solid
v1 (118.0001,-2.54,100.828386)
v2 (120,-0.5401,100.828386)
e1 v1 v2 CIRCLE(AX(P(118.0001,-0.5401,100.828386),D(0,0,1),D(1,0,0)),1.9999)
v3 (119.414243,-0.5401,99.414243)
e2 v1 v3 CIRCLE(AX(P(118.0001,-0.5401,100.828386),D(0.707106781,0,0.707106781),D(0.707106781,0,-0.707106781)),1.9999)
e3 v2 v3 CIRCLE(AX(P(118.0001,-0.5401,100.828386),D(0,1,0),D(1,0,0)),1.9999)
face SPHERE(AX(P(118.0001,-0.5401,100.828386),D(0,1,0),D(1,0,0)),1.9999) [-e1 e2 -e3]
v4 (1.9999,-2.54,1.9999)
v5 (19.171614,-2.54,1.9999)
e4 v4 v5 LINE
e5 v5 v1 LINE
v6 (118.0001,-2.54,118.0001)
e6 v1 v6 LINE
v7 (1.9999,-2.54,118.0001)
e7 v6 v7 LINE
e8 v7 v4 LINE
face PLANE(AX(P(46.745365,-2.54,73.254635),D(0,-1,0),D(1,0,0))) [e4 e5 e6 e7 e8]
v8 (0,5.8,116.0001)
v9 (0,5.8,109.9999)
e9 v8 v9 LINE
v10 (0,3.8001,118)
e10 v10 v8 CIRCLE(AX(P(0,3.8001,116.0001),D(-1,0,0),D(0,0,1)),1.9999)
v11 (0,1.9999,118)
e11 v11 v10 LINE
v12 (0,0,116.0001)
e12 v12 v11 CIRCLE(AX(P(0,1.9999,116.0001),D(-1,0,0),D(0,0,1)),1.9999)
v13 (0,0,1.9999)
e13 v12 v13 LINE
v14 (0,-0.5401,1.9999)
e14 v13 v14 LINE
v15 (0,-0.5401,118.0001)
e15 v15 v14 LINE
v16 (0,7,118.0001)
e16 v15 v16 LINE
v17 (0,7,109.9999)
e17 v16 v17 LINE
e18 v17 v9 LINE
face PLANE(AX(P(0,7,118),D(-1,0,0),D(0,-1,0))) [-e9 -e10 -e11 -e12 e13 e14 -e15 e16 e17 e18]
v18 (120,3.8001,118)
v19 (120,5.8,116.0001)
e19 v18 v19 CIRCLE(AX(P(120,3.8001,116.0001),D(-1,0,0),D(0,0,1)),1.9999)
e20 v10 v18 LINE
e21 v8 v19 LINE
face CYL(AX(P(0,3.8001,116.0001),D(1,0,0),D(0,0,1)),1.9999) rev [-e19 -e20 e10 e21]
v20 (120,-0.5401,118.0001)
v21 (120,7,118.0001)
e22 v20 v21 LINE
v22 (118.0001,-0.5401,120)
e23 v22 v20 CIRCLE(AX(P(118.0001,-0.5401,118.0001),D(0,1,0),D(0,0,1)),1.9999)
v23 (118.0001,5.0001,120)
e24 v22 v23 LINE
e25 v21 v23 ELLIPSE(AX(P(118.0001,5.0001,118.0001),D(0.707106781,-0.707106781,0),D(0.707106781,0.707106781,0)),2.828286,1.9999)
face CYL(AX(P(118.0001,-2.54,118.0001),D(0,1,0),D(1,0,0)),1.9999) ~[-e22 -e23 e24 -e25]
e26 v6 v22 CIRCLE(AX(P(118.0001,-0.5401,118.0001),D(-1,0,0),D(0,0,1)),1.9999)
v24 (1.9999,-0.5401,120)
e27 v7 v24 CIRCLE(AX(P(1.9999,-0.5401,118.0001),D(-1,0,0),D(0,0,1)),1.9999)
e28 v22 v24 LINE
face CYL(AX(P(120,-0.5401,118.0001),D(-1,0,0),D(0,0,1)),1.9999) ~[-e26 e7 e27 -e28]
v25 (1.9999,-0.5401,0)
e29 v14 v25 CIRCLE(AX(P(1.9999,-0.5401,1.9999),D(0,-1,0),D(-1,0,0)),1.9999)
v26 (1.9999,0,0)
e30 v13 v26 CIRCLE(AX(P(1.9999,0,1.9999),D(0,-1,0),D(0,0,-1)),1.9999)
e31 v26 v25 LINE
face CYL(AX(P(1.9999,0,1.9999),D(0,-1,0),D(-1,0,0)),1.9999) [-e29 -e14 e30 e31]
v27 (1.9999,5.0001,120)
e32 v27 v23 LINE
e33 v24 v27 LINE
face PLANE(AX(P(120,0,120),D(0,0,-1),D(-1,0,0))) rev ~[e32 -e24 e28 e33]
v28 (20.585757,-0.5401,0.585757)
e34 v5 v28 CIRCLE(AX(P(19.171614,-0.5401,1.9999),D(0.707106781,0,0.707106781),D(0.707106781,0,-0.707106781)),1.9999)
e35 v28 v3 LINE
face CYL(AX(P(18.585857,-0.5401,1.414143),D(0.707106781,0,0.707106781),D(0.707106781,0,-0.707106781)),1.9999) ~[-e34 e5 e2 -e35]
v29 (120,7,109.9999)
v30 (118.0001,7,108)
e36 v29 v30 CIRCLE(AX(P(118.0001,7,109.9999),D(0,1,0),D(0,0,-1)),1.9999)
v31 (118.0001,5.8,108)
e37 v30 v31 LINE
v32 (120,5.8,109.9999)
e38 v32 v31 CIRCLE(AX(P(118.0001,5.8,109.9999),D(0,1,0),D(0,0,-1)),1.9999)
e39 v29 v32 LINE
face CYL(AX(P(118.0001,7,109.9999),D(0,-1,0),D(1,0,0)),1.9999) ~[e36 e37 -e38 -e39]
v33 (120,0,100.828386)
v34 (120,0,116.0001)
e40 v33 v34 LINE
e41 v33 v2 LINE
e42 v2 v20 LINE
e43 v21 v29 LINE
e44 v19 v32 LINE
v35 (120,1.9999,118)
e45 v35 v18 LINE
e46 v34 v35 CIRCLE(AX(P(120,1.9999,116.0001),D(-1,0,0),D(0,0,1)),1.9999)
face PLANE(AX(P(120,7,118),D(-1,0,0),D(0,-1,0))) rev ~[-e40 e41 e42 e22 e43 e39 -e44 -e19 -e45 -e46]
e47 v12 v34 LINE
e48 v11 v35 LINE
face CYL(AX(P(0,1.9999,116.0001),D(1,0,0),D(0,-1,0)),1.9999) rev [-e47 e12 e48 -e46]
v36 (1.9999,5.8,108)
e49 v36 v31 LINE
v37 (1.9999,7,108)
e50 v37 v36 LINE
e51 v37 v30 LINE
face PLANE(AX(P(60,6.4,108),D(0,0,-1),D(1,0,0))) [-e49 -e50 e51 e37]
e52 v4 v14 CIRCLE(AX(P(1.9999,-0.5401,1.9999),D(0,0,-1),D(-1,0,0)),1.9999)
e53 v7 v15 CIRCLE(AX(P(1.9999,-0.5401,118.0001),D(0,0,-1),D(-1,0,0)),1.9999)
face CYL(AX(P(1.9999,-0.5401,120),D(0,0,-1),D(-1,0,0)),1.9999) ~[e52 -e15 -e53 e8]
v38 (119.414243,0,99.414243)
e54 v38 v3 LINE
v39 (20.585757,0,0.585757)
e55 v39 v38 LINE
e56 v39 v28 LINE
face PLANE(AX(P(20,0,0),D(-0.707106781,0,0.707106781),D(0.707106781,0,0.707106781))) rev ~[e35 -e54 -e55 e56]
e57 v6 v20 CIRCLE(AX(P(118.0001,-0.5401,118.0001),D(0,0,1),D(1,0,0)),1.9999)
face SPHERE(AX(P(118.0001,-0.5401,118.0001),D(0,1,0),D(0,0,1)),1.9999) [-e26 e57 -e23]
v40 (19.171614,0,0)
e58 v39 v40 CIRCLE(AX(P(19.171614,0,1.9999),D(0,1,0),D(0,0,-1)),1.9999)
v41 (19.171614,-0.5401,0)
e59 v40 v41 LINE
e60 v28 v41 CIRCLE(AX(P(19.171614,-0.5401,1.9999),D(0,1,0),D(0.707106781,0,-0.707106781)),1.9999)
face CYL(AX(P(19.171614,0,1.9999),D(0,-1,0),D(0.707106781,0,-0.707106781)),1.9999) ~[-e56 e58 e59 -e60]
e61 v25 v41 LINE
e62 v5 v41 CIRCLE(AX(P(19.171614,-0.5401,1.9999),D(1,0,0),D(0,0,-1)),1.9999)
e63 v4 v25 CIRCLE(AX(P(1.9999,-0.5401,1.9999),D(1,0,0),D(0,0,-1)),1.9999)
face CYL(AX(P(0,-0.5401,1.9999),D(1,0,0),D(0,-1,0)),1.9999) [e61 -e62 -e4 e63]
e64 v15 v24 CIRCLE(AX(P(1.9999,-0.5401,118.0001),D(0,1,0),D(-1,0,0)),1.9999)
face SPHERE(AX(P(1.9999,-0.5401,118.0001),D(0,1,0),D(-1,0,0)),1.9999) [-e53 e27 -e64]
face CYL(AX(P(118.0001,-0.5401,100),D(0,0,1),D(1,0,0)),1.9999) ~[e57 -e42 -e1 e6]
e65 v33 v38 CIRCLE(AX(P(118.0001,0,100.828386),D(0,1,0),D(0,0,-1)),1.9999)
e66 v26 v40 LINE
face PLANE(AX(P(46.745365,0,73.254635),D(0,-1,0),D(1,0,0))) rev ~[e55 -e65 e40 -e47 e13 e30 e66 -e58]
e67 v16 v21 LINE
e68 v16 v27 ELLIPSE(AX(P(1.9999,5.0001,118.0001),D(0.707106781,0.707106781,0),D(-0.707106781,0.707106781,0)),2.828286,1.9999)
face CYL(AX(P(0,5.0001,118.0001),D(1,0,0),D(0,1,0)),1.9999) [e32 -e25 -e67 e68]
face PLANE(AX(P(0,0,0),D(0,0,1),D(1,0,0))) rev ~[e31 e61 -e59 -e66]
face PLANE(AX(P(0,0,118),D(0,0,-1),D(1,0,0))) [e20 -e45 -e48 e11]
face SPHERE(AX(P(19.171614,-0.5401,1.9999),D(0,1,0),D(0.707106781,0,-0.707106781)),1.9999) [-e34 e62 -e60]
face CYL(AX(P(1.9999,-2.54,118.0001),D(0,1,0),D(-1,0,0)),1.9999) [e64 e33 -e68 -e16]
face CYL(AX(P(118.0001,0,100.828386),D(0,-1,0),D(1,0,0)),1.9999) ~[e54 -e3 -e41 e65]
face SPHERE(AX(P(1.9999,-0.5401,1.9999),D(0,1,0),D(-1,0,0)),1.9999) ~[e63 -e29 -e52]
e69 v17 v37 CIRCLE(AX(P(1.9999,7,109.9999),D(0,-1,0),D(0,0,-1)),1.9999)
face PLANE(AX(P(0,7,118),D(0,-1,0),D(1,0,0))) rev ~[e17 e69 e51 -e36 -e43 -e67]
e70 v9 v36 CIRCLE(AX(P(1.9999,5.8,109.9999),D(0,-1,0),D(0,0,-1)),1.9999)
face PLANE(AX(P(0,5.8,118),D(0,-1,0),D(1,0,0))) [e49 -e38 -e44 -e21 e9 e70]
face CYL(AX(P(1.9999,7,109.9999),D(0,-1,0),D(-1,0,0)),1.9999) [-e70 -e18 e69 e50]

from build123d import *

# Parameters (mm, degrees)
F1_W     = 120
F1_H     = 2
F2_DEPTH = 7
F3_DEPTH = 2.54
F4_W     = 120
F4_H     = 1.2
F5_DEPTH = 10
F6_R     = 1.9999


# Not quite as in the source:
# - a fillet or chamfer is up to 0.001 mm smaller than in the source, because OpenCascade refuses the exact size


with BuildPart() as f2:
    # F1 (on face) → F2 (new body)
    with BuildSketch(Plane.XZ):
        with Locations((60, 119)):
            Rectangle(F1_W, F1_H)
    extrude(amount=-F2_DEPTH)

    # F0 (on Front) → F3 (join)
    with BuildSketch(Plane.XZ):
        Polygon((0, 120), (0, 0), (20, 0), (120, 100), (120, 120), align=None)
    extrude(amount=F3_DEPTH)

    # F4 (on face) → F5 (join)
    with BuildSketch(Plane(origin=(0, 0, 118), x_dir=(1, 0, 0), z_dir=(0, 0, -1))):
        with Locations((60, -6.4)):
            Rectangle(F4_W, F4_H)
    extrude(amount=F5_DEPTH)

    # F6 (radius 2 in the source; OpenCascade refuses exactly that, so slightly less here)
    f6_edges = [f2.edges().sort_by_distance(p)[0] for p in [
        (0, -1.27, 0),
        (20, -1.27, 0),
        (120, -1.27, 100),
        (0, 2.23, 120),
        (120, 2.23, 120),
        (120, 6.4, 108),
        (0, 6.4, 108),
        (0, -2.54, 60),
        (60, -2.54, 120),
        (120, -2.54, 110),
        (70, -2.54, 50),
        (10, -2.54, 0),
        (60, 0, 118),
        (60, 5.8, 118),
        (60, 7, 120),
    ]]
    fillet(f6_edges, radius=F6_R)


solid = f2.part
